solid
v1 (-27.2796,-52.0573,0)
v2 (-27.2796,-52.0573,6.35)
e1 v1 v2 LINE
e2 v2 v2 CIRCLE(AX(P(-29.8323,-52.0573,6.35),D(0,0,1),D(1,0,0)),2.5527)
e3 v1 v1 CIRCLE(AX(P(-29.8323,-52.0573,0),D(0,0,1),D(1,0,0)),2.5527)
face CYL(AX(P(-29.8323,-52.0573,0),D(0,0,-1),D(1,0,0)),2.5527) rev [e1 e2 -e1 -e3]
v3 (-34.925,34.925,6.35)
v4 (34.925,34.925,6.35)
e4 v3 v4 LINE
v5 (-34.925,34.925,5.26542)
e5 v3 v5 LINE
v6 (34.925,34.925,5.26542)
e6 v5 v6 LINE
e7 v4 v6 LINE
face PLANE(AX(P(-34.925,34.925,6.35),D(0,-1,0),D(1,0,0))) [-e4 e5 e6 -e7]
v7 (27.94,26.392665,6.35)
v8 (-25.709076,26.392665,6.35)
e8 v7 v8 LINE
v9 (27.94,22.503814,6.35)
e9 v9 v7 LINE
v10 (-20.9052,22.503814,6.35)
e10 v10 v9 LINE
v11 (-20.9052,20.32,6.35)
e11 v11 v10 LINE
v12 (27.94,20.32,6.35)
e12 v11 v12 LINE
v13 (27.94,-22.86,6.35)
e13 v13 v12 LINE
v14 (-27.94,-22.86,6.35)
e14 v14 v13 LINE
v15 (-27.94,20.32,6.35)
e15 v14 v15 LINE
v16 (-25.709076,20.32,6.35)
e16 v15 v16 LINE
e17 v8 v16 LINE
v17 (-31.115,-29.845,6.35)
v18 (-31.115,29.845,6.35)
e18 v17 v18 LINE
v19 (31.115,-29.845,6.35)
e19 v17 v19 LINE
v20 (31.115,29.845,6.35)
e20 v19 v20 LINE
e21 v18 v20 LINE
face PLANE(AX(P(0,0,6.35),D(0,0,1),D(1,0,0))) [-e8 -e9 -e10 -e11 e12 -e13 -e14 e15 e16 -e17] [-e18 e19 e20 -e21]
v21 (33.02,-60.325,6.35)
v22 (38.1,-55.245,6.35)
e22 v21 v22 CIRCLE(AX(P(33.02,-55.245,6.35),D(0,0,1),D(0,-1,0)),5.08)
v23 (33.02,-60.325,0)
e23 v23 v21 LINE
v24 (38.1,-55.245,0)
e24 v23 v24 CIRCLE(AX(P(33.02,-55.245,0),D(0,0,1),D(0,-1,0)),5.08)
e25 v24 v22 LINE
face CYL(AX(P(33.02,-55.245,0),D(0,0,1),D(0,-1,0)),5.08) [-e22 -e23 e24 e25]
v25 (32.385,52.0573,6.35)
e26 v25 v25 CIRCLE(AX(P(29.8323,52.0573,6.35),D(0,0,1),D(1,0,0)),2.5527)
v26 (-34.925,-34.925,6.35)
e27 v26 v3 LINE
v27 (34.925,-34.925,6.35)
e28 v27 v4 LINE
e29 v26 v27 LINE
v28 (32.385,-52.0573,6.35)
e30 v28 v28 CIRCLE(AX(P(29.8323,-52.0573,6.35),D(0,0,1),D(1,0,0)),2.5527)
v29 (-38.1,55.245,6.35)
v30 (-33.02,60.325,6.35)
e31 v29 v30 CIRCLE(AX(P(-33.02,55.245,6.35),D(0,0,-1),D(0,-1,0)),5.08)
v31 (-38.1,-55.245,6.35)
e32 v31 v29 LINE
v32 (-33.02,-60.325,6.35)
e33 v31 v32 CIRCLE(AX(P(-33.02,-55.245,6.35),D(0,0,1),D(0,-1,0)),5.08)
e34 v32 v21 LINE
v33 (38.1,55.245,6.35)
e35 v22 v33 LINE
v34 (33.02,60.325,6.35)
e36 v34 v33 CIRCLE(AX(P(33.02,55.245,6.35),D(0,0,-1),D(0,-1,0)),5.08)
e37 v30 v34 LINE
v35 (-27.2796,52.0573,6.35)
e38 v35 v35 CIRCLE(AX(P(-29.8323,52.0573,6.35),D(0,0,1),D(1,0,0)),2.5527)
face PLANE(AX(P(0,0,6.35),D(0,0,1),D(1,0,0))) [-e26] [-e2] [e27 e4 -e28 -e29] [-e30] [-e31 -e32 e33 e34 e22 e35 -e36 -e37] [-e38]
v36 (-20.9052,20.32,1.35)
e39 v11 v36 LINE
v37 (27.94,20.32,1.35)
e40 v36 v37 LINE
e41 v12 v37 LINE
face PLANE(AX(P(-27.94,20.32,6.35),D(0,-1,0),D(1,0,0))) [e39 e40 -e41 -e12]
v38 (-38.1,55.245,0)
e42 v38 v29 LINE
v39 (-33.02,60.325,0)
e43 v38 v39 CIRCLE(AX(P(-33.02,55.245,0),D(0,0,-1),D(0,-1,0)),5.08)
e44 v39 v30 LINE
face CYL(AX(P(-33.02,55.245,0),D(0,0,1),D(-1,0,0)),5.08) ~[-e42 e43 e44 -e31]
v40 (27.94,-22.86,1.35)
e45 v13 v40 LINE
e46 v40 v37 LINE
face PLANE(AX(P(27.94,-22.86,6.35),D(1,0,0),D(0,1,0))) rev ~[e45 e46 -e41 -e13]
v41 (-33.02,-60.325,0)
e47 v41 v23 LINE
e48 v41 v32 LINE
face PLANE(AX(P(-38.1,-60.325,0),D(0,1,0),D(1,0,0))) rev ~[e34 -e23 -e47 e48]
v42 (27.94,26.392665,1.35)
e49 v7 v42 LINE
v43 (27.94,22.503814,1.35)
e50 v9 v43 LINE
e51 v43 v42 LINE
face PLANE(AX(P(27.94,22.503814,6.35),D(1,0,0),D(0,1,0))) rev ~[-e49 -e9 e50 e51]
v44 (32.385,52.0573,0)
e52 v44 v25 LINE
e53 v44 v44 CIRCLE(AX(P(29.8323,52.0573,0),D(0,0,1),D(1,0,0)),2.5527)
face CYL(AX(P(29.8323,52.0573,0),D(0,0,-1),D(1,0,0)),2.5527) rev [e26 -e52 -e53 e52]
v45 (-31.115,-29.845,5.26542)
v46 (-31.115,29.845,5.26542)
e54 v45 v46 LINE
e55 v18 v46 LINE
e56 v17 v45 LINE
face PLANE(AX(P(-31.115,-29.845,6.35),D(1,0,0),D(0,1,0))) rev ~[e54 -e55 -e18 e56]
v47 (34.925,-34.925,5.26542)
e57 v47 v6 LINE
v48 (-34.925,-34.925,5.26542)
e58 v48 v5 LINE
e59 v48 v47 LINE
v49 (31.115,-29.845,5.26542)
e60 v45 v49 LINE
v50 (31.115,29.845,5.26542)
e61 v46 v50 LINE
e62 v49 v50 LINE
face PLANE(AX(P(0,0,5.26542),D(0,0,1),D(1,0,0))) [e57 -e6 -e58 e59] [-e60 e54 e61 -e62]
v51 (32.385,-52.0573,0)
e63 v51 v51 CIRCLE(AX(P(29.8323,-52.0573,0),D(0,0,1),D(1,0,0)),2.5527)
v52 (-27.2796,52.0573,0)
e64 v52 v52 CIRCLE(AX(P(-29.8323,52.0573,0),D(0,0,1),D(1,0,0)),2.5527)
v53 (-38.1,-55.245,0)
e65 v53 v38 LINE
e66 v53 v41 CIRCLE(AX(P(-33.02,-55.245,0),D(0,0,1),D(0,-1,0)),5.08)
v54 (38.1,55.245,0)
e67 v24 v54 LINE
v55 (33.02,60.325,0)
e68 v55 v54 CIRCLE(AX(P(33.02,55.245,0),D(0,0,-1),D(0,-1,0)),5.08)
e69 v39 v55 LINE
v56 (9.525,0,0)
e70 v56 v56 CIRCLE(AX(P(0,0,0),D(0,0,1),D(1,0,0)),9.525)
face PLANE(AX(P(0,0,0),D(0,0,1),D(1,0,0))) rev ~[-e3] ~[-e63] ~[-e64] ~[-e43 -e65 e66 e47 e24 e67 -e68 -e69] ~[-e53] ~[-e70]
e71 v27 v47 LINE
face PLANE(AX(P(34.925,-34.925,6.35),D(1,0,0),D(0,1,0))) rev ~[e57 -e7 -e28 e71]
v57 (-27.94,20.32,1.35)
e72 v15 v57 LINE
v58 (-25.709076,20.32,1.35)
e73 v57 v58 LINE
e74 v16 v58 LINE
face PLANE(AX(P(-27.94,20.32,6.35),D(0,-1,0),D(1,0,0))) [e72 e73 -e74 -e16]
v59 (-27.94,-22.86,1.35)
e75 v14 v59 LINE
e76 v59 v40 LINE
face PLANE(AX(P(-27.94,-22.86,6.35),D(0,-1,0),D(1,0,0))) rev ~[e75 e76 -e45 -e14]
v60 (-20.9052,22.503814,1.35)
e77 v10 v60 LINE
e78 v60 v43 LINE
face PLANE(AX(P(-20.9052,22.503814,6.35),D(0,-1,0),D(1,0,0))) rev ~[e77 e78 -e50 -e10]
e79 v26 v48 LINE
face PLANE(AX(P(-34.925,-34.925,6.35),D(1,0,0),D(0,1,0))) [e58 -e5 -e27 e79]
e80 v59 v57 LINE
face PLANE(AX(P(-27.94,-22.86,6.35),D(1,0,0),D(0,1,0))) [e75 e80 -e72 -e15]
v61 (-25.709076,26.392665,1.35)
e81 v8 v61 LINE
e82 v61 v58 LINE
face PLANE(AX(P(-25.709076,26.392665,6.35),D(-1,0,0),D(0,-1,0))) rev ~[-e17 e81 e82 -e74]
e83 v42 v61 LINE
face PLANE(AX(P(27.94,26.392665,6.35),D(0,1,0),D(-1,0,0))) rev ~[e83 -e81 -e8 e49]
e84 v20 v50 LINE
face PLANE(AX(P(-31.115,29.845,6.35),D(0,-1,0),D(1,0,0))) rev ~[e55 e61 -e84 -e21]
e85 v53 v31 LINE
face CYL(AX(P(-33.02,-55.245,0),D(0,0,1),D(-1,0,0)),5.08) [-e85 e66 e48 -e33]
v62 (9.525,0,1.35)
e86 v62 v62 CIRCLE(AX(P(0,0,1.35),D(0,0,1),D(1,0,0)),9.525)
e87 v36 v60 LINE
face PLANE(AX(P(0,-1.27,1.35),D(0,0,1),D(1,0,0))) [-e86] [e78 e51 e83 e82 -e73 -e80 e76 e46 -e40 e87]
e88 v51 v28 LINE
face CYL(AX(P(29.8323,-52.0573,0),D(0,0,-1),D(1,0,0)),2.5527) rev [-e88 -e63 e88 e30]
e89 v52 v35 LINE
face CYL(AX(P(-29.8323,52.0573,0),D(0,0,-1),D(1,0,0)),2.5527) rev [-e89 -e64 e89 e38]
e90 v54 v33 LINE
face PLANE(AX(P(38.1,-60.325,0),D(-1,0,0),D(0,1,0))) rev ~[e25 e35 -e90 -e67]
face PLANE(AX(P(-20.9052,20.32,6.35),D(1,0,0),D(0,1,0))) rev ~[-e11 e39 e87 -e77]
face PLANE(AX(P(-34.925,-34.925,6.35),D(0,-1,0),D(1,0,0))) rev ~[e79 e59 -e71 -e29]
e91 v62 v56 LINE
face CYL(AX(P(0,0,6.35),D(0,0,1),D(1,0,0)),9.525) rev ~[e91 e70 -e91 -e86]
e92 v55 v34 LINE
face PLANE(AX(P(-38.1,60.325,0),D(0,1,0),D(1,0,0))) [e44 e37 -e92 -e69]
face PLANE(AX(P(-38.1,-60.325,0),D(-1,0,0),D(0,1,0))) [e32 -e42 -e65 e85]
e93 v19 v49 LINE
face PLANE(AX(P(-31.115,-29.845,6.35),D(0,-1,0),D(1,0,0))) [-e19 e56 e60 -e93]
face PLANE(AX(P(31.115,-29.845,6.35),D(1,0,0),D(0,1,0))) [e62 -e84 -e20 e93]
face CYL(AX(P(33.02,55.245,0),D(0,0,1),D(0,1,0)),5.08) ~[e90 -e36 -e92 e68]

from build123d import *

# Parameters (mm, degrees)
F0_W     = 76.2
F0_H     = 120.65
F0_R     = 2.5527
F1_DEPTH = 6.35
F2_R     = 9.525
F3_DEPTH = 6.35
F2_W     = 55.88
F2_H     = 43.18
F4_DEPTH = 5
F5_R     = 5.08
F6_W     = 69.85
F6_H     = 69.85
F6_W_2   = 62.23
F6_H_2   = 59.69
F7_DEPTH = 1.08458
F9_DEPTH = 5


# Not quite as in the source:
# - a length typed as a fraction of an inch, garbled in the dataset ("3 / 203.2 mm" for 3/8 in), is restored


with BuildPart() as f1:
    # F0 (on Top) → F1 (new body)
    with BuildSketch(Plane.XY):
        Rectangle(F0_W, F0_H)
        with Locations((-29.8323, -52.0573)):
            Circle(F0_R, mode=Mode.SUBTRACT)
        with Locations((29.8323, -52.0573)):
            Circle(F0_R, mode=Mode.SUBTRACT)
        with Locations((-29.8323, 52.0573)):
            Circle(F0_R, mode=Mode.SUBTRACT)
        with Locations((29.8323, 52.0573)):
            Circle(F0_R, mode=Mode.SUBTRACT)
    extrude(amount=F1_DEPTH)

    # F2 (on face) → F3 (cut)
    with BuildSketch(Plane.XY.offset(6.35)):
        Circle(F2_R)
    extrude(amount=-F3_DEPTH, mode=Mode.SUBTRACT)

    # F2 (on face) → F4 (cut)
    with BuildSketch(Plane.XY.offset(6.35)):
        with Locations((0, -1.27)):
            Rectangle(F2_W, F2_H)
        Circle(F2_R, mode=Mode.SUBTRACT)
    extrude(amount=-F4_DEPTH, mode=Mode.SUBTRACT)

    # F5
    f5_edges = [f1.edges().sort_by_distance(p)[0] for p in [
        (38.1, -60.325, 3.175),
        (38.1, 60.325, 3.175),
        (-38.1, 60.325, 3.175),
        (-38.1, -60.325, 3.175),
    ]]
    fillet(f5_edges, radius=F5_R)

    # F6 (on face) → F7 (cut)
    with BuildSketch(Plane.XY.offset(6.35)):
        Rectangle(F6_W, F6_H)
        Rectangle(F6_W_2, F6_H_2, mode=Mode.SUBTRACT)
    extrude(amount=-F7_DEPTH, mode=Mode.SUBTRACT)

    # F8 (on face) → F9 (cut)
    with BuildSketch(Plane.XY.offset(6.35)):
        Polygon((-25.7090758532, 20.32), (-20.905200392, 20.32), (-20.905200392, 22.5038137287), (27.94, 22.5038137287), (27.94, 26.3926647604), (-25.7090758532, 26.3926647604), align=None)
    extrude(amount=-F9_DEPTH, mode=Mode.SUBTRACT)


solid = f1.part
